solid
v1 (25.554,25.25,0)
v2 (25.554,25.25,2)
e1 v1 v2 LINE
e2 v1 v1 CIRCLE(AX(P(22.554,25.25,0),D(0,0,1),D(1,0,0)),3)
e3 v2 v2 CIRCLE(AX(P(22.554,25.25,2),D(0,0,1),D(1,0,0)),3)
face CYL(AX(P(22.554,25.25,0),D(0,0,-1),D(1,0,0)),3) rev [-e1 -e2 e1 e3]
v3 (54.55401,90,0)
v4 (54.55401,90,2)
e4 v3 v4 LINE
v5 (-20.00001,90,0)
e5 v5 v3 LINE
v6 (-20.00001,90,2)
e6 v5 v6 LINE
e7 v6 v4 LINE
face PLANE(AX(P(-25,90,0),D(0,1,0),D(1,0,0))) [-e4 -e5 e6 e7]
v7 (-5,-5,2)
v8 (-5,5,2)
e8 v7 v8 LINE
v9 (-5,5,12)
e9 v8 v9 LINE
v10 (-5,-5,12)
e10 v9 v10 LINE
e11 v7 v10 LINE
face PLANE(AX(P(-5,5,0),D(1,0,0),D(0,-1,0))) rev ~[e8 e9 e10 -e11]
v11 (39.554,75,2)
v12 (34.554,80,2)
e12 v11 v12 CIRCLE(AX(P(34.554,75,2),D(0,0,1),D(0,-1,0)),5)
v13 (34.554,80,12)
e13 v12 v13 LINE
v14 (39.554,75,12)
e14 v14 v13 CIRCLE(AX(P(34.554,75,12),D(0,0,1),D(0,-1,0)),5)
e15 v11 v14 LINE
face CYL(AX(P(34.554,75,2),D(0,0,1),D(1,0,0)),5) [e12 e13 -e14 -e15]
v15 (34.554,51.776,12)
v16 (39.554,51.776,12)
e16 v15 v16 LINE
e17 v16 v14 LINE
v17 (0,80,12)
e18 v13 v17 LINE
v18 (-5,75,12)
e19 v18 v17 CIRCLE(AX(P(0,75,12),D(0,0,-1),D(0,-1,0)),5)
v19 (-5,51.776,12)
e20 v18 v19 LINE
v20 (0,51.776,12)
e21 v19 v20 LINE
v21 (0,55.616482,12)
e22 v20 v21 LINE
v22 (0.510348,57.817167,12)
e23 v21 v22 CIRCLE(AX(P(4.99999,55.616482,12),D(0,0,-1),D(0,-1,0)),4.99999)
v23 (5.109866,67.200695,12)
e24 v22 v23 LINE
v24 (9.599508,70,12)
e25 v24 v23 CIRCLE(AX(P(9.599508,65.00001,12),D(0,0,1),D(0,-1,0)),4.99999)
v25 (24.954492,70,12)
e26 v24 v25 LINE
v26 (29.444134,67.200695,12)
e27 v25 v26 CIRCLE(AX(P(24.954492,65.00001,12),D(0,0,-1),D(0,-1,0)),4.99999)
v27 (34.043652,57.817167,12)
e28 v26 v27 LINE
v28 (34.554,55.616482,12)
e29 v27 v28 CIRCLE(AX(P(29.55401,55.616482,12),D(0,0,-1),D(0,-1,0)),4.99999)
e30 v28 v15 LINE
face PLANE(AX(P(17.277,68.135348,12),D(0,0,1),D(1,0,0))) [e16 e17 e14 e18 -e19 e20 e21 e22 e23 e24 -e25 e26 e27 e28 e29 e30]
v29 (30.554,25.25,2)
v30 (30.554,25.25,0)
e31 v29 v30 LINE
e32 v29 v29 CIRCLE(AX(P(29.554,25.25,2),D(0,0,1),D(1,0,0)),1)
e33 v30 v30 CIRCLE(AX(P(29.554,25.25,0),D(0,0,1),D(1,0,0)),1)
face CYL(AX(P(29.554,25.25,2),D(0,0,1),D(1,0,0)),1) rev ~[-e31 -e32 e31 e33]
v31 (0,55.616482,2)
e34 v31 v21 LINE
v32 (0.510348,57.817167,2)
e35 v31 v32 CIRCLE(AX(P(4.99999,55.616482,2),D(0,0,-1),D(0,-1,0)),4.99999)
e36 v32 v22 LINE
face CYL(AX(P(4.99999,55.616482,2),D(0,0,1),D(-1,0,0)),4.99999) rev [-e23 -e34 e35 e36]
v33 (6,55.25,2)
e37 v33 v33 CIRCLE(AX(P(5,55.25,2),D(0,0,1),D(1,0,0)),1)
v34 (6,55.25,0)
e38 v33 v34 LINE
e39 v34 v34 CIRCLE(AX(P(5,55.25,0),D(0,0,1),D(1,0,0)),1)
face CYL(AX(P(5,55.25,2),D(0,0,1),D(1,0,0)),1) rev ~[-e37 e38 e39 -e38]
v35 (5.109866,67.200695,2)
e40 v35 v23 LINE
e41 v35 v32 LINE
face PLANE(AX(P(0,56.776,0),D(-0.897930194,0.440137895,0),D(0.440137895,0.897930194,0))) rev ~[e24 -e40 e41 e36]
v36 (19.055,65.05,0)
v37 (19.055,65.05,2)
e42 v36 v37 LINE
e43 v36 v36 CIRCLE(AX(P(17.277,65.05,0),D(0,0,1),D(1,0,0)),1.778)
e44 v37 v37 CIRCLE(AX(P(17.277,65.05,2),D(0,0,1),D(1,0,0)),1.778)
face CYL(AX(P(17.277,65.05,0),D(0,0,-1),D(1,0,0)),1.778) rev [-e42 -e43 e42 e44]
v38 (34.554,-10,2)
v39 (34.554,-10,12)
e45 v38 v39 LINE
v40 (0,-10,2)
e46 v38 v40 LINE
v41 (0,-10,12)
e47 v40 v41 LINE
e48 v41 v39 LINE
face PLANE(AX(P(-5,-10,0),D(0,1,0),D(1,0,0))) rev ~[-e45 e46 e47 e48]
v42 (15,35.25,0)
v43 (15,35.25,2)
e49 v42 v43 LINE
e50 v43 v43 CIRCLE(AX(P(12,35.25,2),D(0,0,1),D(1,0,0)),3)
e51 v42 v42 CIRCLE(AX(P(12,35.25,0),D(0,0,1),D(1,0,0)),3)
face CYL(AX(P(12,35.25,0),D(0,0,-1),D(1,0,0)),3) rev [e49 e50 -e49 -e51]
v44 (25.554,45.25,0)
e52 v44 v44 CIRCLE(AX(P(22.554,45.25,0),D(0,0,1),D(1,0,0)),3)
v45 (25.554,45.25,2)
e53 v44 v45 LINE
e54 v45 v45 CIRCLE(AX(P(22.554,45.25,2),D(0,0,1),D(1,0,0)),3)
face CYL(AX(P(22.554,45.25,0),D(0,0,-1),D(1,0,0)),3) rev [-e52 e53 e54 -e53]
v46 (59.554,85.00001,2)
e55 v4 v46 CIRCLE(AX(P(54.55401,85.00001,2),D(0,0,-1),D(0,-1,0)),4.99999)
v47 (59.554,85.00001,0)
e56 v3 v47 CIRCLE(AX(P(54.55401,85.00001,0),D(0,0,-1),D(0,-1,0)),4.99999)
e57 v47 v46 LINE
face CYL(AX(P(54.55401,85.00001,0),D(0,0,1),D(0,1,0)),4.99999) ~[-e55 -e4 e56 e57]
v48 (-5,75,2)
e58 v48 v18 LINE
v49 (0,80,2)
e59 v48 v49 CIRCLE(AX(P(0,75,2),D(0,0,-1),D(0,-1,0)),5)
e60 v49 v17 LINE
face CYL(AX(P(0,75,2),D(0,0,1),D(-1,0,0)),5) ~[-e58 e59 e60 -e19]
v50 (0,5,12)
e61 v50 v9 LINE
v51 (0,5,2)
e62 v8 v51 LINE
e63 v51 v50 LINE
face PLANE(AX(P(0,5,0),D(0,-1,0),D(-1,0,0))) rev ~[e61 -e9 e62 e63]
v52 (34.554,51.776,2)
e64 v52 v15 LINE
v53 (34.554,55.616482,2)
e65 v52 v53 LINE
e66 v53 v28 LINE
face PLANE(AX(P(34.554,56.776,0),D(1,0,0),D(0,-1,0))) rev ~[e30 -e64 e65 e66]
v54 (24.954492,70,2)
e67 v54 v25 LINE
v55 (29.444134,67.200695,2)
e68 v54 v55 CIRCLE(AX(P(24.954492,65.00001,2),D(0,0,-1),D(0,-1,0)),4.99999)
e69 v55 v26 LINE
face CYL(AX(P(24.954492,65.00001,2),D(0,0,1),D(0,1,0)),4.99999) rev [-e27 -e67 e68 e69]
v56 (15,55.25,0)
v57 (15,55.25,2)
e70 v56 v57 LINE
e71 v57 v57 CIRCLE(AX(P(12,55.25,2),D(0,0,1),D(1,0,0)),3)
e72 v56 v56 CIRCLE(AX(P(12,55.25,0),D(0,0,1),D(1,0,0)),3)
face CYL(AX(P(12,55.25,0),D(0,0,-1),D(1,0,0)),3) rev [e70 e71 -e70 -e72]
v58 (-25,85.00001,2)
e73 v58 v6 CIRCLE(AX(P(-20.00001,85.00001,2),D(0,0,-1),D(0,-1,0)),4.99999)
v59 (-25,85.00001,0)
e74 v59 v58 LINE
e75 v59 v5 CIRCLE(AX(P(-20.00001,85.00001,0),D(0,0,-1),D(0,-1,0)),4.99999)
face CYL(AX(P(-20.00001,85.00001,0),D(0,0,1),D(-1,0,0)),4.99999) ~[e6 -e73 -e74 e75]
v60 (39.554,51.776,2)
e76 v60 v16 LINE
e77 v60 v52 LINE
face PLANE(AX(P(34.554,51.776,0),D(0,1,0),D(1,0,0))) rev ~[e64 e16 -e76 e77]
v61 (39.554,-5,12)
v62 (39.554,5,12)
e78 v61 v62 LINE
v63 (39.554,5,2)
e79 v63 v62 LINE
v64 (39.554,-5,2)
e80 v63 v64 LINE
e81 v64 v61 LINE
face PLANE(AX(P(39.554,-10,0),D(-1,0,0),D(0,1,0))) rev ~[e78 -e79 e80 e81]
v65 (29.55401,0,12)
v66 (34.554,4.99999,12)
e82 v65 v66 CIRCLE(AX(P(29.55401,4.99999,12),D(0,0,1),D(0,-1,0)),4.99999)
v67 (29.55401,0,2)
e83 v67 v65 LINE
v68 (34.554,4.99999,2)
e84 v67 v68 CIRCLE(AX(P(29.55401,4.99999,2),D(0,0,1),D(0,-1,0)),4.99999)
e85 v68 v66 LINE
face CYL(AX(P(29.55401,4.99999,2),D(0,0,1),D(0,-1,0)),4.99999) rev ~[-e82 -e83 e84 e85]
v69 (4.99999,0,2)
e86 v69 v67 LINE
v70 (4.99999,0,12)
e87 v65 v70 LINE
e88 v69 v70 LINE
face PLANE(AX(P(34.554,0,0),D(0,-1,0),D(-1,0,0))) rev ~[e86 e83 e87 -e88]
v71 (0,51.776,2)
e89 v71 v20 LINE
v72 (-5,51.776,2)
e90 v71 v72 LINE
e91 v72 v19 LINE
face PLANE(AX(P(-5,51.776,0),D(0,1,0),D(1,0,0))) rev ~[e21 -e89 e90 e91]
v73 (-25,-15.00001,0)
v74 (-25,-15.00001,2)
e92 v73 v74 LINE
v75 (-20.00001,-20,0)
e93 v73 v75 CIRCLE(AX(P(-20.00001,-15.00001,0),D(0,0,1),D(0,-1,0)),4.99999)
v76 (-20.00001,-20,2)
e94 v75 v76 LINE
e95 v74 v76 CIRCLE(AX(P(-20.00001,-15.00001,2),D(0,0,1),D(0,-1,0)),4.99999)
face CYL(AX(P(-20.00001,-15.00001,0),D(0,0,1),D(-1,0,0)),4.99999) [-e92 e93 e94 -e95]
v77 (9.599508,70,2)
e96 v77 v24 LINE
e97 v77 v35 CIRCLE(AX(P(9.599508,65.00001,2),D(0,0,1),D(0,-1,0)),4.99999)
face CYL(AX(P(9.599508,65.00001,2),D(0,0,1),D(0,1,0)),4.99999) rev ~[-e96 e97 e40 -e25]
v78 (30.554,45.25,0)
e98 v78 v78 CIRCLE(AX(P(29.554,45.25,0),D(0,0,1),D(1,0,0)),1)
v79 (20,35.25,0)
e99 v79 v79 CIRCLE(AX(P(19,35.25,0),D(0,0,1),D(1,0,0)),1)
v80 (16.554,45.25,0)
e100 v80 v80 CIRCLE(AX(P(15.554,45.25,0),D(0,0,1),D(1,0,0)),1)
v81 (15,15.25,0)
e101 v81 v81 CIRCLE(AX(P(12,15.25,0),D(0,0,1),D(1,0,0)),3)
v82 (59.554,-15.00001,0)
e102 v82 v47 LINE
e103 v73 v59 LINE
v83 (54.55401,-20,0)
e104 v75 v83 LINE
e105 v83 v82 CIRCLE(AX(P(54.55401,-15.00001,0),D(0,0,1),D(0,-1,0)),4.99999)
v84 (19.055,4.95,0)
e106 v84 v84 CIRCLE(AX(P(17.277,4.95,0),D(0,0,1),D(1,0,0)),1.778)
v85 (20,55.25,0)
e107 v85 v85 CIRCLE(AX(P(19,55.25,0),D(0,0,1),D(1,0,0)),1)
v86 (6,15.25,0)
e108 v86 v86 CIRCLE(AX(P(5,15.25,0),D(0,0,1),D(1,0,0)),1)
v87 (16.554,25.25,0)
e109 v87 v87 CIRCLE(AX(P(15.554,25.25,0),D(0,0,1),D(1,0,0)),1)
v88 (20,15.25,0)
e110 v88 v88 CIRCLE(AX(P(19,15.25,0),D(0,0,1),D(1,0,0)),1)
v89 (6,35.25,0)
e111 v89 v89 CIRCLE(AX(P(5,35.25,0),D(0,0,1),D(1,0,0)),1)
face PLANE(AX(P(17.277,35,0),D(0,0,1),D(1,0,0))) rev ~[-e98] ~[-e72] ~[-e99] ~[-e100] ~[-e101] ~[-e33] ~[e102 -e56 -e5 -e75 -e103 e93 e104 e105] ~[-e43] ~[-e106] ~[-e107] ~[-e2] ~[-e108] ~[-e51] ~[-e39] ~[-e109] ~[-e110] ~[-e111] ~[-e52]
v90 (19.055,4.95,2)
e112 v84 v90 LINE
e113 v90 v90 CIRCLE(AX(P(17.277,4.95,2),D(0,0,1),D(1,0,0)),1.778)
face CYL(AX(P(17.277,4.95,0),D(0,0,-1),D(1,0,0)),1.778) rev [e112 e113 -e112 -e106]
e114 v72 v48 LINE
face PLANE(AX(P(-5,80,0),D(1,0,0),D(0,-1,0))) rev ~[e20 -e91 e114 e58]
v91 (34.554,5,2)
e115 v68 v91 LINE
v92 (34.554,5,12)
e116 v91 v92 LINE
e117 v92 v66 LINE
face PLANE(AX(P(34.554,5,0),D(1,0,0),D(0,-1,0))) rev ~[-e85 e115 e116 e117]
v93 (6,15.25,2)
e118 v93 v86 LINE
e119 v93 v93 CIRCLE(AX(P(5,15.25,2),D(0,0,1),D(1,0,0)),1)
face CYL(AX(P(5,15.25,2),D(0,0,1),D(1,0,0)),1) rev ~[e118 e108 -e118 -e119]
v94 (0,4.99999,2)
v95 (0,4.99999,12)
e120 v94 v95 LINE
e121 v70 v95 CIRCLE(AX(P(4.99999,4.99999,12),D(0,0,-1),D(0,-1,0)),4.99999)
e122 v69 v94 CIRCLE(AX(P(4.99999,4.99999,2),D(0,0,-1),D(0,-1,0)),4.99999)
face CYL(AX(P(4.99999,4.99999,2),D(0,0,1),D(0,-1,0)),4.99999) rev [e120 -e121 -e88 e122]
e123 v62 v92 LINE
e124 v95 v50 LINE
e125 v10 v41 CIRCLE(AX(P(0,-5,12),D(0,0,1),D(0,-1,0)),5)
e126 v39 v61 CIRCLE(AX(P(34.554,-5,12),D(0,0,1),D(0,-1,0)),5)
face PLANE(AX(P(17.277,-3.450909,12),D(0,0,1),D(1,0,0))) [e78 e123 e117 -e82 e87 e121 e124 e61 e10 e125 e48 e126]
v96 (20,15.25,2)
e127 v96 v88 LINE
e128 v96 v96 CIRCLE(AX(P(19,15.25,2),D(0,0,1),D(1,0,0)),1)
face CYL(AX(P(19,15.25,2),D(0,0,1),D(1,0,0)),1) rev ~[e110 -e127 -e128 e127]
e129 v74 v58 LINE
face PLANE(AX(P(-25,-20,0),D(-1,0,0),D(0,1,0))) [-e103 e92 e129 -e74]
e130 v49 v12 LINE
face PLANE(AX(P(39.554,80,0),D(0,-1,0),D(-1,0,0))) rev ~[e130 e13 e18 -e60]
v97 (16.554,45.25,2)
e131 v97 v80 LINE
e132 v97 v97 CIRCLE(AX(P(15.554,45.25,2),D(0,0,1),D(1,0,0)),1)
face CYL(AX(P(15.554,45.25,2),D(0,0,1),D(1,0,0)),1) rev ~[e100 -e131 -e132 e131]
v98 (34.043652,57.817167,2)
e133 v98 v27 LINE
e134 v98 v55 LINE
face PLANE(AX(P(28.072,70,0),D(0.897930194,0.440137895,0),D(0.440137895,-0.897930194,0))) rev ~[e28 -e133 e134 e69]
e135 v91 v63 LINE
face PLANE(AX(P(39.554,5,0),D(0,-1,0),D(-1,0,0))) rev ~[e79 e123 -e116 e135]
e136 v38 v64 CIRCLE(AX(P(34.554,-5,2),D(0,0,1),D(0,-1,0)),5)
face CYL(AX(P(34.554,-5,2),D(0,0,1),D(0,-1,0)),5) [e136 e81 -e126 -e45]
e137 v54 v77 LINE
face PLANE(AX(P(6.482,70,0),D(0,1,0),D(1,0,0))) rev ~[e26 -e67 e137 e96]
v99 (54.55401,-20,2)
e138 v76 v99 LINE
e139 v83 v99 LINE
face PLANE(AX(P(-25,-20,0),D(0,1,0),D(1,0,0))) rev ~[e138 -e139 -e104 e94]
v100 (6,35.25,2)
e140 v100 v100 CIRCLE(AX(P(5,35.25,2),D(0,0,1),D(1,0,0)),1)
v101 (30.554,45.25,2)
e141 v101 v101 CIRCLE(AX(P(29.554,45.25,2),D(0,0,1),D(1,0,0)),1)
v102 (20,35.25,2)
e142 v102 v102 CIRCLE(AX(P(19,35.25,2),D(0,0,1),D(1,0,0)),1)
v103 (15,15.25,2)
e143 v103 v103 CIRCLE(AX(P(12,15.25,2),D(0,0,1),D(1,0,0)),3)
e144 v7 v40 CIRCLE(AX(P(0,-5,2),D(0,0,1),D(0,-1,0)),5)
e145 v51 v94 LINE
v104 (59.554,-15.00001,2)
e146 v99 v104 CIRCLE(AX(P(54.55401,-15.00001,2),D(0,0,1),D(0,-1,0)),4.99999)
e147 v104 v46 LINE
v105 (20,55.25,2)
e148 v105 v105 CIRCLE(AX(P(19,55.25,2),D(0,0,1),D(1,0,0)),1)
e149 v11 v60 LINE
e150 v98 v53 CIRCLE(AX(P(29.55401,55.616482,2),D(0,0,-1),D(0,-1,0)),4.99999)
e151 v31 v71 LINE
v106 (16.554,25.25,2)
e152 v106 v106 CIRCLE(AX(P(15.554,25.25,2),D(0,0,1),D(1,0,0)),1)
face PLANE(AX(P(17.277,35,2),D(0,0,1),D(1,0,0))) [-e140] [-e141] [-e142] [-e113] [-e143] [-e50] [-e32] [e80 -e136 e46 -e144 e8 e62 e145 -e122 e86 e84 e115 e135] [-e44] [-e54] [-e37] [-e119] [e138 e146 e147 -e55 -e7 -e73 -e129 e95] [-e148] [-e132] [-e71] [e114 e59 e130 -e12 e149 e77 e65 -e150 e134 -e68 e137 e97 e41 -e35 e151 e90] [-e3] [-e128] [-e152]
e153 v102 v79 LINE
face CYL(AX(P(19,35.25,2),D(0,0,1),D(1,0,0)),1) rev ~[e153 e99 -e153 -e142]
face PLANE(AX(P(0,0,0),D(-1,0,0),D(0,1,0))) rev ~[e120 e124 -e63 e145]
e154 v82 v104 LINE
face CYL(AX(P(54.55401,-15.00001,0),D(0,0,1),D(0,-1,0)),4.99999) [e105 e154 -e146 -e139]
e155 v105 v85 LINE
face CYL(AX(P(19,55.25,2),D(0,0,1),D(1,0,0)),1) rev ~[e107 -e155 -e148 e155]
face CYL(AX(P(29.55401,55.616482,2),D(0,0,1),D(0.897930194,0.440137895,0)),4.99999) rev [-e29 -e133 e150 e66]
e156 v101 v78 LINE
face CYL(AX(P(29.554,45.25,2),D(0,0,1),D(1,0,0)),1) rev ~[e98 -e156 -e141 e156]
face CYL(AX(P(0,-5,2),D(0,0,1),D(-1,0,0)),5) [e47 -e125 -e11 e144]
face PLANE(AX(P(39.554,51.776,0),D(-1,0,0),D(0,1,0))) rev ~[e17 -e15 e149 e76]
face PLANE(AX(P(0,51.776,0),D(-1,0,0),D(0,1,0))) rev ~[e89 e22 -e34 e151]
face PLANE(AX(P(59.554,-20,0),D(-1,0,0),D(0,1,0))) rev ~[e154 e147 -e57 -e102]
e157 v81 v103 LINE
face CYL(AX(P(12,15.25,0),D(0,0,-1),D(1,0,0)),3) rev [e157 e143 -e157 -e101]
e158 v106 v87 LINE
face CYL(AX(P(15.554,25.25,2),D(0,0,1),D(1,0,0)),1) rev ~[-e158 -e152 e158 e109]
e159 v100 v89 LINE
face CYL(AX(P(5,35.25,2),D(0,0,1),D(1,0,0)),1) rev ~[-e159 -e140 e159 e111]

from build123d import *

# Parameters (mm, degrees)
F0_W     = 84.554
F0_H     = 110
F0_R     = 3
F0_R_2   = 1.778
F1_DEPTH = 2
F2_DEPTH = 12
F3_DEPTH = 12
F4_R     = 4.99999
F5_R     = 5
F6_R     = 1
F7_DEPTH = 25
F8_DEPTH = 25


# Not quite as in the source:
# - a fillet or chamfer is up to 0.001 mm smaller than in the source, because OpenCascade refuses the exact size
# - a feature names something its author has since deleted; it is built from what else it names


with BuildPart() as f1:
    # F0 (on Top) → F1 (new body)
    with BuildSketch(Plane.XY):
        with Locations((17.277, 35)):
            Rectangle(F0_W, F0_H)
        with Locations((12, 15.25)):
            Circle(F0_R, mode=Mode.SUBTRACT)
        Polygon((0, 5), (0, 0), (34.554, 0), (34.554, 5), (39.554, 5), (39.554, -10), (-5, -10), (-5, 5), align=None, mode=Mode.SUBTRACT)
        with Locations((17.277, 4.95)):
            Circle(F0_R_2, mode=Mode.SUBTRACT)
        with Locations((22.554, 25.25)):
            Circle(F0_R, mode=Mode.SUBTRACT)
        with Locations((12, 35.25)):
            Circle(F0_R, mode=Mode.SUBTRACT)
        with Locations((12, 55.25)):
            Circle(F0_R, mode=Mode.SUBTRACT)
        with Locations((22.554, 45.25)):
            Circle(F0_R, mode=Mode.SUBTRACT)
        with Locations((17.277, 65.05)):
            Circle(F0_R_2, mode=Mode.SUBTRACT)
        Polygon((6.482, 70), (0, 56.776), (0, 51.776), (-5, 51.776), (-5, 80), (39.554, 80), (39.554, 51.776), (34.554, 51.776), (34.554, 56.776), (28.072, 70), align=None, mode=Mode.SUBTRACT)
    extrude(amount=F1_DEPTH)

    # F0 (on Top) → F2 (join)
    with BuildSketch(Plane.XY):
        Polygon((0, 51.776), (0, 56.776), (6.482, 70), (28.072, 70), (34.554, 56.776), (34.554, 51.776), (39.554, 51.776), (39.554, 80), (-5, 80), (-5, 51.776), align=None)
    extrude(amount=F2_DEPTH)

    # F0 (on Top) → F3 (join)
    with BuildSketch(Plane.XY):
        Polygon((34.554, 0), (0, 0), (0, 5), (-5, 5), (-5, -10), (39.554, -10), (39.554, 5), (34.554, 5), align=None)
    extrude(amount=F3_DEPTH)

    # F4 (radius 5 in the source; OpenCascade refuses exactly that, so slightly less here)
    f4_edges = [f1.edges().sort_by_distance(p)[0] for p in [
        (6.482, 70, 7),
        (28.072, 70, 7),
        (0, 56.776, 7),
        (34.554, 56.776, 7),
        (34.554, 0, 7),
        (0, 0, 7),
        (59.554, -20, 1),
        (59.554, 90, 1),
        (-25, 90, 1),
        (-25, -20, 1),
    ]]
    fillet(f4_edges, radius=F4_R)

    # F5
    f5_edges = [f1.edges().sort_by_distance(p)[0] for p in [
        (-5, -10, 7),
        (39.554, -10, 7),
        (39.554, 80, 7),
        (-5, 80, 7),
    ]]
    fillet(f5_edges, radius=F5_R)

    # F6 (on face) → F7 (cut)
    with BuildSketch(Plane.XY.offset(2)):
        with Locations((5, 55.25)):
            Circle(F6_R)
        with Locations((19, 55.25)):
            Circle(F6_R)
        with Locations((19, 35.25)):
            Circle(F6_R)
        with Locations((5, 35.25)):
            Circle(F6_R)
        with Locations((15.554, 25.25)):
            Circle(F6_R)
        with Locations((29.554, 25.25)):
            Circle(F6_R)
    extrude(amount=-F7_DEPTH, mode=Mode.SUBTRACT)

    # F6 (on face) → F8 (cut)
    with BuildSketch(Plane.XY.offset(2)):
        with Locations((5, 55.25)):
            Circle(F6_R)
        with Locations((19, 55.25)):
            Circle(F6_R)
        with Locations((19, 35.25)):
            Circle(F6_R)
        with Locations((5, 35.25)):
            Circle(F6_R)
        with Locations((15.554, 25.25)):
            Circle(F6_R)
        with Locations((29.554, 25.25)):
            Circle(F6_R)
        with Locations((15.554, 45.25)):
            Circle(F6_R)
        with Locations((29.554, 45.25)):
            Circle(F6_R)
        with Locations((5, 15.25)):
            Circle(F6_R)
        with Locations((19, 15.25)):
            Circle(F6_R)
    extrude(amount=-F8_DEPTH, mode=Mode.SUBTRACT)


solid = f1.part
